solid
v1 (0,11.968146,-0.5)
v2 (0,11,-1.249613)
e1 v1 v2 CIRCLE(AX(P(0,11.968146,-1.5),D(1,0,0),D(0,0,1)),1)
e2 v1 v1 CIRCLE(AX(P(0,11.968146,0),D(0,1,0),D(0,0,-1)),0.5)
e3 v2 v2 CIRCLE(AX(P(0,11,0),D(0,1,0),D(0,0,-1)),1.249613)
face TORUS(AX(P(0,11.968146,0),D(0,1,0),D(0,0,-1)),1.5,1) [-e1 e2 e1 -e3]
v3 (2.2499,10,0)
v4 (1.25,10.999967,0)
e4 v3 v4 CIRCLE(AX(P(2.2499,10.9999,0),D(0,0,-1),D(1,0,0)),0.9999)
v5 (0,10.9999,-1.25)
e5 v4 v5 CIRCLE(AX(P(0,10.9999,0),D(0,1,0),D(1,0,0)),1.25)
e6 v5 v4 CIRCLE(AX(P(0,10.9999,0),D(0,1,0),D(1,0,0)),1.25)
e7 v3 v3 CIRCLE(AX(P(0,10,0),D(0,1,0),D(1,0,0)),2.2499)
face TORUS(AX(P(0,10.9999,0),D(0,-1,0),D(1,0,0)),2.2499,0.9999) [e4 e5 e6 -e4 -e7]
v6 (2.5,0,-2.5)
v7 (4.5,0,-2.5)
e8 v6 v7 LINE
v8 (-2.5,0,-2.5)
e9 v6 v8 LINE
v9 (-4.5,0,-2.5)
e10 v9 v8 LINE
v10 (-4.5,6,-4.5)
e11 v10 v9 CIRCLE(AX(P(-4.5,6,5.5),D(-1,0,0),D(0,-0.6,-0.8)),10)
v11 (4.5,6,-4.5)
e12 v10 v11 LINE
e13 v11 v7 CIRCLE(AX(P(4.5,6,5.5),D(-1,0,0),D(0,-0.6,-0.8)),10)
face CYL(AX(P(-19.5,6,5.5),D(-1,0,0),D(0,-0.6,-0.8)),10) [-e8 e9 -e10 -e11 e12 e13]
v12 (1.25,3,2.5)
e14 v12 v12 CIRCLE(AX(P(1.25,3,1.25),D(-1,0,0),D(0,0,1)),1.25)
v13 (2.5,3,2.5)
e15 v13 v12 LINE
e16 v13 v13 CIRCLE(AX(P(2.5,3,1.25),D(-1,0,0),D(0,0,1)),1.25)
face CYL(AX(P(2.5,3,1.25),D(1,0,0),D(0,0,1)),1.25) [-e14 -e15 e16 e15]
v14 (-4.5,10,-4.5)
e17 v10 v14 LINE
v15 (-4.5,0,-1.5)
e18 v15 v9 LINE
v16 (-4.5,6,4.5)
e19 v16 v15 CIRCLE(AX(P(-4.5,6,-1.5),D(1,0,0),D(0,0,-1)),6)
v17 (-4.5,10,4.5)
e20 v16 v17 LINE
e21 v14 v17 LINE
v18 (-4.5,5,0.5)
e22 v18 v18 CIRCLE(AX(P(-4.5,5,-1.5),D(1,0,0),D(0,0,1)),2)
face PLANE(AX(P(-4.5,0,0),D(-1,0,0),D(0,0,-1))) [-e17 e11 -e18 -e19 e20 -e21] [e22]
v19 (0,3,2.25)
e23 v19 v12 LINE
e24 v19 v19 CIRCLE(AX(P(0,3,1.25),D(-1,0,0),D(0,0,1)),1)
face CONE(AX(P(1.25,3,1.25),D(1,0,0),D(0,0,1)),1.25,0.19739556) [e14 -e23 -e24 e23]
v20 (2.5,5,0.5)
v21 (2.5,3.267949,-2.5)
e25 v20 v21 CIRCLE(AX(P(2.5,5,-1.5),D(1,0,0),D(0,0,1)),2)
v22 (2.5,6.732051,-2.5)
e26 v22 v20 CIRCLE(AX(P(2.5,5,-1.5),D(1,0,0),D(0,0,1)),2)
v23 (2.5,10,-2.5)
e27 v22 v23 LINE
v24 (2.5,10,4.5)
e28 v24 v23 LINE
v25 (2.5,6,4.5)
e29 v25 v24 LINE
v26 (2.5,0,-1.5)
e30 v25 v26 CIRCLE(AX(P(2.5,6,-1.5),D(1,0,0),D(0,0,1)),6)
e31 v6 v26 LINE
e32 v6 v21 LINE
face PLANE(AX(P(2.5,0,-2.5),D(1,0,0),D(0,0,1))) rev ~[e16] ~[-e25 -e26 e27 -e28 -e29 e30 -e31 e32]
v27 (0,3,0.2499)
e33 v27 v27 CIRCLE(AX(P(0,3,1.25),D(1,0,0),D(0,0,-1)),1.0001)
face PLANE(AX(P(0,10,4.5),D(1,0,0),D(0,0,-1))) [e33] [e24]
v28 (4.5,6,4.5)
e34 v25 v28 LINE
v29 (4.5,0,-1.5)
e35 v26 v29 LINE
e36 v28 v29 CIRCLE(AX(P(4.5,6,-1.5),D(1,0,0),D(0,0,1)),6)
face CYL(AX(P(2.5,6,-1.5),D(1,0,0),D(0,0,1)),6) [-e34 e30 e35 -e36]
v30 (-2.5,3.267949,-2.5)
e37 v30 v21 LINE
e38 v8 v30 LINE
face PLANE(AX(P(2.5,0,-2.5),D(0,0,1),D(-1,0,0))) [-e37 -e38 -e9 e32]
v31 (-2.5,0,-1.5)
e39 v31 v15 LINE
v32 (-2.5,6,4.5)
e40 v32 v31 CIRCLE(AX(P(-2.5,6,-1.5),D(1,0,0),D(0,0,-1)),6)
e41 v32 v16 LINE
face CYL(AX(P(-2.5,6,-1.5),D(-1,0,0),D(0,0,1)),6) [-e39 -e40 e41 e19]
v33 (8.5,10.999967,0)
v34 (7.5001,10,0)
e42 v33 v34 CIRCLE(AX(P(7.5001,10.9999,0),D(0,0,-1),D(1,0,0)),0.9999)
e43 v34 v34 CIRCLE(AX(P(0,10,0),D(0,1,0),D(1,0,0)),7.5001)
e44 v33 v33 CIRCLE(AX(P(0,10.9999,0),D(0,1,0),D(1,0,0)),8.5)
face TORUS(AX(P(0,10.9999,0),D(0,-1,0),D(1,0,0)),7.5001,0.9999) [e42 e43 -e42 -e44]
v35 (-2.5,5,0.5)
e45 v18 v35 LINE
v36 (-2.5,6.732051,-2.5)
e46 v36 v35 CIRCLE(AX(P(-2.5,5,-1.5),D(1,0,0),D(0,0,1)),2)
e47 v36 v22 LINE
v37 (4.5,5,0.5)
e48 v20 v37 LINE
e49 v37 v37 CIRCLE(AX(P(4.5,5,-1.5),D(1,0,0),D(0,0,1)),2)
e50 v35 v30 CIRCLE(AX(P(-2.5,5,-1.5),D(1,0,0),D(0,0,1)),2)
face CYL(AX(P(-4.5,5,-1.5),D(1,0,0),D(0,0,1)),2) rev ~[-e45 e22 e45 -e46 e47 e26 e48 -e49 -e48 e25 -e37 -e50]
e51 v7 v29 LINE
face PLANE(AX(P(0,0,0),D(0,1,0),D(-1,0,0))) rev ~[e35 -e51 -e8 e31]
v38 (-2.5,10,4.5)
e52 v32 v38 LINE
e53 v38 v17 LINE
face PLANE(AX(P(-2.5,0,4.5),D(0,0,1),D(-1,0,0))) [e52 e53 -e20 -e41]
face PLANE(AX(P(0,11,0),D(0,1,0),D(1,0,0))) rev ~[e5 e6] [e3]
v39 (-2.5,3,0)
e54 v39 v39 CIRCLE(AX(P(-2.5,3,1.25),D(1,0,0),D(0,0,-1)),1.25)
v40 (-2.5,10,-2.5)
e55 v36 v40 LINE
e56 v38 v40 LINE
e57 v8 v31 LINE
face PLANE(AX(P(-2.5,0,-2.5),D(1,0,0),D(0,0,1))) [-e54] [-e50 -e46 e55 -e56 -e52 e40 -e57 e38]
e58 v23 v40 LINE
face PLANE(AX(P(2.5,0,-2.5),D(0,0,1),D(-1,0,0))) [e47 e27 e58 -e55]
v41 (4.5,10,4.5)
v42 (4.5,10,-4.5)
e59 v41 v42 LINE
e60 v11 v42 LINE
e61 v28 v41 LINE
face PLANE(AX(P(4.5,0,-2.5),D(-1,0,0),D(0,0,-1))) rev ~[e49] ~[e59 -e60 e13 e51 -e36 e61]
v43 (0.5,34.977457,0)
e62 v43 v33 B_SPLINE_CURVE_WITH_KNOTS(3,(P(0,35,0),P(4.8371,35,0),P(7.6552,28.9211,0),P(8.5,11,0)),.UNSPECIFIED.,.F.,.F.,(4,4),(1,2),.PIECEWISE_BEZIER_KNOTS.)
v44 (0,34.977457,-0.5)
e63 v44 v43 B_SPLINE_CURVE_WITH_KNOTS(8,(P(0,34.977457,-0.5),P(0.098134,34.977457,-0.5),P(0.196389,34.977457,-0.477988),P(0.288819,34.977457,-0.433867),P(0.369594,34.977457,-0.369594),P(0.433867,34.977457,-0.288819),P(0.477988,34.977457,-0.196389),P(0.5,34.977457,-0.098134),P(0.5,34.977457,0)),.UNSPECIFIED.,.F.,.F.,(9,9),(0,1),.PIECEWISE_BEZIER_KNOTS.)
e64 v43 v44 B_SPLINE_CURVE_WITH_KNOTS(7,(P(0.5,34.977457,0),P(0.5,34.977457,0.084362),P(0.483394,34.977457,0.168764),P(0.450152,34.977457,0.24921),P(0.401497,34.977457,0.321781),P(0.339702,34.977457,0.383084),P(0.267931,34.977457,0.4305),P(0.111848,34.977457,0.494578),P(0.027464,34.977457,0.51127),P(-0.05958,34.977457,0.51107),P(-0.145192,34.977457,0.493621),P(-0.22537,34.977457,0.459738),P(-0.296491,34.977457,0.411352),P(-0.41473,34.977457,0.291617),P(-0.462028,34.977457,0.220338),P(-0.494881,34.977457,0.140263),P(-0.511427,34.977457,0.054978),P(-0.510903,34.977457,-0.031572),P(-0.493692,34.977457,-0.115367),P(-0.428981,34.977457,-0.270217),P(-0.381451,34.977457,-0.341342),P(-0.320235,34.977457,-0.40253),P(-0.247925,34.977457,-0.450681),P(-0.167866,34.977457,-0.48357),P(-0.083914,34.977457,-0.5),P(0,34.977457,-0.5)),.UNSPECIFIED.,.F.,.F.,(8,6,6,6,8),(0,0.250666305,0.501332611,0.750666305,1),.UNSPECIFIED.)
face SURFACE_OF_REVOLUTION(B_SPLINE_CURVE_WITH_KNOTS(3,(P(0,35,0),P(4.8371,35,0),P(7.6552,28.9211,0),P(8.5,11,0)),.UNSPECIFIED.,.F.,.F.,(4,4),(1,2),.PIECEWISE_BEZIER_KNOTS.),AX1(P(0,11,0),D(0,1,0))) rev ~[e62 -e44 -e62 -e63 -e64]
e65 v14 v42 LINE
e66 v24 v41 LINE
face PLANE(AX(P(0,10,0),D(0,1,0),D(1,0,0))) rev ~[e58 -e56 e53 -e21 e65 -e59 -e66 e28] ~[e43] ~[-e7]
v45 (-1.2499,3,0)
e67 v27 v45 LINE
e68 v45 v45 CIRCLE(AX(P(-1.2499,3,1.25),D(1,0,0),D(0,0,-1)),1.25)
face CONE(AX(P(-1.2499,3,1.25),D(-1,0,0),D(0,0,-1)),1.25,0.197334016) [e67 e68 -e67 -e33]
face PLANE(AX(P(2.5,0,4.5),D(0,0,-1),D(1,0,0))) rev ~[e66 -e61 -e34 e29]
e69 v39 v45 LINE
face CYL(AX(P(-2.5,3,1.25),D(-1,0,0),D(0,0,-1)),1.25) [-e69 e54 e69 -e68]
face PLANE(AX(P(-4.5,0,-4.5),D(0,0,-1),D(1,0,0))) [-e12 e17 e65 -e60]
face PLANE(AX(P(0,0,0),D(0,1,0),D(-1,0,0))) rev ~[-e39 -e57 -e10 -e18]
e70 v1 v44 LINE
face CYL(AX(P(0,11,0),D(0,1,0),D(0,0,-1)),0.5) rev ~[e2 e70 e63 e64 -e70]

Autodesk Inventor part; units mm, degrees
ref_plane "YZ Plane" through (0, 0, 0) normal (1, 0, 0) x (0, 1, 0)
ref_plane "XZ Plane" through (0, 0, 0) normal (0, 1, 0) x (-1, 0, 0)
sketch "Sketch1" plane through (0, 0, 0) normal (0, 1, 0) x (-1, 0, 0)
  circle A0 centre (0, 0) radius 8.5
  line L0 (0, 0) -> (-2.5, 0)
  line L1 (-2.5, 0) -> (4.5, 0)
  line L2 (4.5, 0) -> (4.5, -2.5)
  line L3 (4.5, -2.5) -> (4.5, 4.5)
  line L4 (-4.5, 0) -> (-4.5, -2.5)
  line L5 (-4.5, 4.5) -> (-4.5, 0)
  line L6 (4.5, -4.5) -> (-4.5, -4.5)
  line L7 (-2.5, -2.5) -> (2.5, -2.5)
  line L8 (-2.5, -2.5) -> (-2.5, 4.5)
  line L9 (-2.5, 4.5) -> (-4.5, 4.5)
  line L10 (2.5, -2.5) -> (2.5, 4.5)
  line L11 (2.5, 4.5) -> (4.5, 4.5)
  line L12 (-4.5, -2.5) -> (-4.5, -4.5)
  line L13 (4.5, -4.5) -> (4.5, -2.5)
  point P0 (6.5, 0)
extrude "Extrusion1" add sketch "Sketch1" along normal blind 10 contours L8 L7 L10 L1 L2 L13 L6 L12 L4 L5 L9 | L10 L11 L3 L1
sketch "Sketch2" plane through (0, 10, 0) normal (0, 1, 0) x (1, 0, 0)
  circle A0 centre (0, 0) radius 8.5
  circle A1 centre (0, 0) radius 1.25
  dimension "d11" = 17
  dimension "d12" = 2.5
extrude "Extrusion2" add sketch "Sketch2" along normal blind 1
fillet "Fillet3" radius 1 1 edges at (-8.5, 10, 0)
fillet "Fillet4" radius 1 1 edges at (-1.25, 10, 0)
fillet "Fillet5" radius 6 2 edges at (3.5, 0, 4.5) (-3.5, 0, 4.5)
fillet "Fillet6" radius 10 1 edges at (0, 0, -4.5)
sketch "Sketch3" plane through (-4.5, 10, -4.5) normal (-1, 0, 0) x (0, 0, 1)
  arc A0 (3, -10) -> (9, -4) centre (3, -4) ccw projected
  line L0 (3, -10) -> (3, -5)
  point P0 (4.5, -10)
  dimension "d24" = 5
hole "Hole1" at (-4.5, 5, -1.5) direction (1, 0, 0) diameter 4 depth 10
sketch "Sketch4" plane through (2.5, 10, -2.5) normal (-1, 0, 0) x (0, 0, 1)
  line L0 (7, -4) -> (7, 0) projected
  circle A0 centre (3.75, -7) radius 1.25
  point P0 (2.5, -10)
extrude "Extrusion3" add sketch "Sketch4" along normal blind 2.5
chamfer "Chamfer1" distance 0.25 distance2 1.25 1 edges at (0, 3, 0) measured on face at (0, 2.3808, 1.5915)
sketch "Sketch5" plane through (-2.5, 10, 4.5) normal (1, 0, 0) x (0, 0, -1)
  circle A0 centre (3.25, -7) radius 1.25 projected
  circle A1 centre (3.25, -7) radius 1.25
  point P0 (4.5, -10)
extrude "Extrusion4" add sketch "Sketch5" along normal blind 2.5
chamfer "Chamfer2" distance 0.25 distance2 1.25 1 edges at (0, 3, 2.5) measured on face at (0, 2.8205, 0.1051)
ref_plane "Work Plane1" through (-1.25, 11, 0) normal (0, 0, 1) x (1, 0, 0)
sketch "Sketch7" plane through (-1.25, 11, 0) normal (0, 0, 1) x (1, 0, 0)
  line L0 (0, 0) -> (2.5, 0) projected
  line L1 (1.25, 0) -> (1.25, 25)
  line L2 (1.25, 0) -> (1.25, 24)
  line L3 (1.25, 24) -> (6.0871, 24) construction
  line L4 (6.0871, 24) -> (8.9052, 17.9211) construction
  line L5 (9.75, 0) -> (-7.25, 0) projected
  line L6 (8.9052, 17.9211) -> (9.75, 0) construction
  spline S0 degree 3 poles (1.25, 24) (6.0871, 24) (8.9052, 17.9211) (9.75, 0) knots 1 1 1 1 2 2 2 2
  line L7 (9.75, 0) -> (1.25, 0)
  point P0 (1.25, -11)
  dimension "d48" = 25
  dimension "d49" = 24
revolve "Revolution1" add sketch "Sketch7" angle 360 about axis through (0, 11, 0) along (0, 1, 0)
sketch "Sketch8" plane through (0, 11, 0) normal (0, -1, 0) x (1, 0, 0)
  circle A0 centre (0, 0) radius 1.25
hole "Hole2" at (0, 11, 0) direction (0, 1, 0) diameter 1 depth 40
fillet "Fillet7" radius 1 1 edges at (0, 11, 0.5)
properties part number "Ring_3" material "ABS Plastic"
